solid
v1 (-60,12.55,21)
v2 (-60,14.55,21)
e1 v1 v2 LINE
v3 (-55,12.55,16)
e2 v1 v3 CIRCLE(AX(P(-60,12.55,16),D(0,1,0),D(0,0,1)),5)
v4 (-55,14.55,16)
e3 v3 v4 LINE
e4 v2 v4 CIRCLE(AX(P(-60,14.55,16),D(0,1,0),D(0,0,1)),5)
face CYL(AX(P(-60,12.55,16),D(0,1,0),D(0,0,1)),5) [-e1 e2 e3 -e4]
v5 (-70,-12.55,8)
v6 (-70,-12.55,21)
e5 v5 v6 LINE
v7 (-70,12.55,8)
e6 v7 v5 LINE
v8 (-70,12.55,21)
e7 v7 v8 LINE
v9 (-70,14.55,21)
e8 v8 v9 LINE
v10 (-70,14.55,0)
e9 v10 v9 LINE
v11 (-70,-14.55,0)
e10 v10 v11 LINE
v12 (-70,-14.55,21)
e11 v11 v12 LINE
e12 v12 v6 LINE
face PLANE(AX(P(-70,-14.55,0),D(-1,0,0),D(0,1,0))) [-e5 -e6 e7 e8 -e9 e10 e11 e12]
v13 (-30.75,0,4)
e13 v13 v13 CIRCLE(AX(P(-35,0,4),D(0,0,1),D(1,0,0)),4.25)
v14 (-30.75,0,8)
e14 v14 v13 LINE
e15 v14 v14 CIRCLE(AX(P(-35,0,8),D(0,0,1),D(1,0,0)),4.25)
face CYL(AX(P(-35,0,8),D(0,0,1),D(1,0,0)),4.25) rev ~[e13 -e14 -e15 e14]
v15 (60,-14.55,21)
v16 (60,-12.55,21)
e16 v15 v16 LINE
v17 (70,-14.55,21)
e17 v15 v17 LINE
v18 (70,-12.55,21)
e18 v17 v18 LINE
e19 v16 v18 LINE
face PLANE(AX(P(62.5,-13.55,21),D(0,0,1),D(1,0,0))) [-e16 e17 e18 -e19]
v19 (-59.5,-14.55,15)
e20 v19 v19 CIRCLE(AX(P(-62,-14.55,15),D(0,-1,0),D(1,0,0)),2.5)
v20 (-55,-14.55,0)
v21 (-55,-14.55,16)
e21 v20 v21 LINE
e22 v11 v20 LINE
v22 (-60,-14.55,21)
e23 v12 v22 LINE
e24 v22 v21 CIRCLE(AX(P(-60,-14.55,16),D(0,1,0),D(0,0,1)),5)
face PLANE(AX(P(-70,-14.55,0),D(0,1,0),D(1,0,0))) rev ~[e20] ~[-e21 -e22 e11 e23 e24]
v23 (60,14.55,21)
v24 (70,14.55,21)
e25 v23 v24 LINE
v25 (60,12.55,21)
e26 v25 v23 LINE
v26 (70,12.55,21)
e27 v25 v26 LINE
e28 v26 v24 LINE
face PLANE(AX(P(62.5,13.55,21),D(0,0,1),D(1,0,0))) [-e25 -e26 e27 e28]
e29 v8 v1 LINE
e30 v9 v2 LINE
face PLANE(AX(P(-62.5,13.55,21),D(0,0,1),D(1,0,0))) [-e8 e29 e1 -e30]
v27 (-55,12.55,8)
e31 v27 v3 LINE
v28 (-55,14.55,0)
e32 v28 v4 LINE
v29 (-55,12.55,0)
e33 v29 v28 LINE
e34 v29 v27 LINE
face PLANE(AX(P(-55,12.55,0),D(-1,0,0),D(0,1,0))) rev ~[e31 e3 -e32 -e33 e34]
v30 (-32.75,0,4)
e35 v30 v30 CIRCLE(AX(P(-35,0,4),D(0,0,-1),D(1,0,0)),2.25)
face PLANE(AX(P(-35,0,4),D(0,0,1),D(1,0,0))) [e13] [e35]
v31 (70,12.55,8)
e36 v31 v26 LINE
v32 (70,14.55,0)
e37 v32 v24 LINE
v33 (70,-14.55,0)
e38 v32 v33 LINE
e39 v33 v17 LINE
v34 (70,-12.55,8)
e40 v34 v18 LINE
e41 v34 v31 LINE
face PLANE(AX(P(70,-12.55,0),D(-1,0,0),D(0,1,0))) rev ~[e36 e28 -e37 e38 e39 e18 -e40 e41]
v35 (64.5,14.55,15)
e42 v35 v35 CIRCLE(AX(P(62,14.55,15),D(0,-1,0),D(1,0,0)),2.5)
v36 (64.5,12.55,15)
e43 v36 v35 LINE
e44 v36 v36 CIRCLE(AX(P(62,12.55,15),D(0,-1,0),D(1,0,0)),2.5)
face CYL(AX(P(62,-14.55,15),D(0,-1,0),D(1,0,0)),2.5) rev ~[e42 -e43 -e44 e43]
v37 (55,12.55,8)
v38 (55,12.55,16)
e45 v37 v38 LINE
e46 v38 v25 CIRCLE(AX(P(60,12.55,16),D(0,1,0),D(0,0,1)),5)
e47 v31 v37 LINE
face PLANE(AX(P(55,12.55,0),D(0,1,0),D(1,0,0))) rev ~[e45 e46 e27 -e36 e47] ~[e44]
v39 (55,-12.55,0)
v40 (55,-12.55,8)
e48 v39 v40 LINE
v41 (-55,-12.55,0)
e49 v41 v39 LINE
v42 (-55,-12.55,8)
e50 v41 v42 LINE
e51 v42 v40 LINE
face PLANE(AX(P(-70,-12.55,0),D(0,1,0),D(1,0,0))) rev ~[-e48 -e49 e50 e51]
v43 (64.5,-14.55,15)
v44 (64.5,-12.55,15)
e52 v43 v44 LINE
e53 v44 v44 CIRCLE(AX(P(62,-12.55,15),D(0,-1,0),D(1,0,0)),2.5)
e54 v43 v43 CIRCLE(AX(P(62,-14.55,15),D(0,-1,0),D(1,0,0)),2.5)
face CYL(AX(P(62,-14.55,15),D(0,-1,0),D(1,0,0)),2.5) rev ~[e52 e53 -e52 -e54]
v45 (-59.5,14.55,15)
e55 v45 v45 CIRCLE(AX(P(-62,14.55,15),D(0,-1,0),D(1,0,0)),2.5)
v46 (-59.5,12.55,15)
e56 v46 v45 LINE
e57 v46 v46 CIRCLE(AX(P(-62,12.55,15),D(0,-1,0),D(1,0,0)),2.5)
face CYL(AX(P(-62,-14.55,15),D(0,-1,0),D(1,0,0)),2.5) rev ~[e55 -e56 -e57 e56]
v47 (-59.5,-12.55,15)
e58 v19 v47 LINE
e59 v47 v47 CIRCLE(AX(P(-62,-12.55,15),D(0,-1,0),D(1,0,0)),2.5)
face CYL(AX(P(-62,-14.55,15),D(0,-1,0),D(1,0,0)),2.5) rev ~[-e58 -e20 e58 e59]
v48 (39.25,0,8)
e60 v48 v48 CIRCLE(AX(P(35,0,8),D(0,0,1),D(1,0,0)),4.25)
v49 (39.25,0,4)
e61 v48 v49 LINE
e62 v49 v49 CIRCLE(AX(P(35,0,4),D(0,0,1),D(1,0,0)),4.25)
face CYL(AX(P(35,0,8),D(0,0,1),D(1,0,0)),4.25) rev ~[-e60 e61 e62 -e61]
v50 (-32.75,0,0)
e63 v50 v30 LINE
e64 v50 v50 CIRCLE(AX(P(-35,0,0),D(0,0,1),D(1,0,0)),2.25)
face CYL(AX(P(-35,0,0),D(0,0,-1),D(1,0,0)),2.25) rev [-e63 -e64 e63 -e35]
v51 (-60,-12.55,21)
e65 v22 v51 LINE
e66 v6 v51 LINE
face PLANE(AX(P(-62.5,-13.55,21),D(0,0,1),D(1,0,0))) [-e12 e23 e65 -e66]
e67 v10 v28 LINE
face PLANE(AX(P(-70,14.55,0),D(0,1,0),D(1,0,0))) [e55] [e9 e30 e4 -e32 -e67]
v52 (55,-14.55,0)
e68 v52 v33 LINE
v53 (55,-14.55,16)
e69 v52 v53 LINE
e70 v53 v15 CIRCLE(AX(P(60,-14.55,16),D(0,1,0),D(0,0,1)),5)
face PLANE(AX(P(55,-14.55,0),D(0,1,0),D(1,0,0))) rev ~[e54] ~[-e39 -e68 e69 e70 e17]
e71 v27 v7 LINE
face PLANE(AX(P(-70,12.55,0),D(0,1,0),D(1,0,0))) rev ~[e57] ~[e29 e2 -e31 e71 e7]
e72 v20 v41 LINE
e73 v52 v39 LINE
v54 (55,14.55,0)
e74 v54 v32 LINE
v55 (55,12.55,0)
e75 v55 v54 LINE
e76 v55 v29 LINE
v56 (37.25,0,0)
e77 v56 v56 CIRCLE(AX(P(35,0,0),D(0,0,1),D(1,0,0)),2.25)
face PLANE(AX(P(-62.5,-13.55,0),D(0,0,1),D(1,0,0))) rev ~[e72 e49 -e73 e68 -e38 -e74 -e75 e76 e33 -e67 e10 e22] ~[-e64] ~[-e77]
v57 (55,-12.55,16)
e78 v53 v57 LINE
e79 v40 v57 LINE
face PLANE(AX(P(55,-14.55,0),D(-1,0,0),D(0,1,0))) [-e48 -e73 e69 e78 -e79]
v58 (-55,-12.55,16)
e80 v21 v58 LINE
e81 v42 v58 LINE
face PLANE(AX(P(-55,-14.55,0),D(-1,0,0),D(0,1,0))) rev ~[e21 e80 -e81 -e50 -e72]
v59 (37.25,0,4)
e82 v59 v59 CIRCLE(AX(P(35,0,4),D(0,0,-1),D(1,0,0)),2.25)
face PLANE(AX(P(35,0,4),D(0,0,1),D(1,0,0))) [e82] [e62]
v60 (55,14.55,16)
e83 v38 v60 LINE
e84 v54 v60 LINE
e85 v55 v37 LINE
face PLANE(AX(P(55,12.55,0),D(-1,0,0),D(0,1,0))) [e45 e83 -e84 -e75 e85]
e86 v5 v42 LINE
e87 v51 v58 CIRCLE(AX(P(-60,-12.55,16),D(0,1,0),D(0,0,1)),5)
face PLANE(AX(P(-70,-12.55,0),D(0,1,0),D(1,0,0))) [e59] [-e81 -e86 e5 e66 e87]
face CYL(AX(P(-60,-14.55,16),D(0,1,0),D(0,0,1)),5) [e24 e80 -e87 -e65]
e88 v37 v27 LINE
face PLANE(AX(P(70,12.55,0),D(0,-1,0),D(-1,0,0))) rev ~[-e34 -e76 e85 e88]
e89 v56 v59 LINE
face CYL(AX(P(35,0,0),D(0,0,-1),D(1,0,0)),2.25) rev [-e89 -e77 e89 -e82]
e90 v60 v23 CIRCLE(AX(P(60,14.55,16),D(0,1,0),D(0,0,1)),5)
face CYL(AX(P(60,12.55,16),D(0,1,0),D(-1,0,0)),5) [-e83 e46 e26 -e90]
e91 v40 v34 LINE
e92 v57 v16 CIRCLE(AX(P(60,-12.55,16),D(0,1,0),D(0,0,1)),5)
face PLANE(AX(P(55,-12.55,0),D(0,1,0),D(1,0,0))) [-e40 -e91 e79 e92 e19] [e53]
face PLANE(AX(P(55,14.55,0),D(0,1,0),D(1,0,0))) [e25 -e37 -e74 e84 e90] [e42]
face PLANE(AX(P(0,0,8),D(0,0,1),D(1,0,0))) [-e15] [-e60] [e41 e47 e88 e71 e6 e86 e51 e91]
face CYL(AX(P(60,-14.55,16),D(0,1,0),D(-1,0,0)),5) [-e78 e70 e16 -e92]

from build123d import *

# Parameters (mm, degrees)
F0_R     = 4.25
F0_R_2   = 2.25
F1_DEPTH = 8
F0_W     = 15
F0_H     = 2
F2_DEPTH = 21
F3_R     = 2.5
F4_DEPTH = 29.101
F5_R     = 5
F6_R     = 4.25
F7_DEPTH = 4


# Not quite as in the source:
# - a feature names something its author has since deleted; it is built from what else it names


with BuildPart() as f1:
    # F0 (on Top) → F1 (new body)
    with BuildSketch(Plane.XY):
        Polygon((55, -12.55), (70, -12.55), (70, 12.55), (55, 12.55), (-55, 12.55), (-70, 12.55), (-70, -12.55), (-55, -12.55), align=None)
        with Locations((-35, 0)):
            Circle(F0_R, mode=Mode.SUBTRACT)
        with Locations((35, 0)):
            Circle(F0_R, mode=Mode.SUBTRACT)
        with Locations((-35, 0)):
            Circle(F0_R)
        with Locations((-35, 0)):
            Circle(F0_R_2, mode=Mode.SUBTRACT)
        with Locations((35, 0)):
            Circle(F0_R)
        with Locations((35, 0)):
            Circle(F0_R_2, mode=Mode.SUBTRACT)
    extrude(amount=F1_DEPTH)

    # F0 (on Top) → F2 (join)
    with BuildSketch(Plane.XY):
        with Locations((-62.5, -13.55)):
            Rectangle(F0_W, F0_H)
        with Locations((62.5, -13.55)):
            Rectangle(F0_W, F0_H)
        with Locations((-62.5, 13.55)):
            Rectangle(F0_W, F0_H)
        with Locations((62.5, 13.55)):
            Rectangle(F0_W, F0_H)
    extrude(amount=F2_DEPTH)

    # F3 (on face) → F4 (cut, through all)
    with BuildSketch(Plane.XZ.offset(14.55)):
        with Locations((-62, 15)):
            Circle(F3_R)
        with Locations((62, 15)):
            Circle(F3_R)
    extrude(amount=-F4_DEPTH, mode=Mode.SUBTRACT)

    # F5
    f5_edges = [f1.edges().sort_by_distance(p)[0] for p in [
        (-55, -13.55, 21),
        (55, -13.55, 21),
        (-55, 13.55, 21),
        (55, 13.55, 21),
    ]]
    fillet(f5_edges, radius=F5_R)

    # F6 (on face) → F7 (cut)
    with BuildSketch(Plane.XY.offset(8)):
        with Locations((-35, 0)):
            Circle(F6_R)
        with Locations((35, 0)):
            Circle(F6_R)
    extrude(amount=-F7_DEPTH, mode=Mode.SUBTRACT)


solid = f1.part
